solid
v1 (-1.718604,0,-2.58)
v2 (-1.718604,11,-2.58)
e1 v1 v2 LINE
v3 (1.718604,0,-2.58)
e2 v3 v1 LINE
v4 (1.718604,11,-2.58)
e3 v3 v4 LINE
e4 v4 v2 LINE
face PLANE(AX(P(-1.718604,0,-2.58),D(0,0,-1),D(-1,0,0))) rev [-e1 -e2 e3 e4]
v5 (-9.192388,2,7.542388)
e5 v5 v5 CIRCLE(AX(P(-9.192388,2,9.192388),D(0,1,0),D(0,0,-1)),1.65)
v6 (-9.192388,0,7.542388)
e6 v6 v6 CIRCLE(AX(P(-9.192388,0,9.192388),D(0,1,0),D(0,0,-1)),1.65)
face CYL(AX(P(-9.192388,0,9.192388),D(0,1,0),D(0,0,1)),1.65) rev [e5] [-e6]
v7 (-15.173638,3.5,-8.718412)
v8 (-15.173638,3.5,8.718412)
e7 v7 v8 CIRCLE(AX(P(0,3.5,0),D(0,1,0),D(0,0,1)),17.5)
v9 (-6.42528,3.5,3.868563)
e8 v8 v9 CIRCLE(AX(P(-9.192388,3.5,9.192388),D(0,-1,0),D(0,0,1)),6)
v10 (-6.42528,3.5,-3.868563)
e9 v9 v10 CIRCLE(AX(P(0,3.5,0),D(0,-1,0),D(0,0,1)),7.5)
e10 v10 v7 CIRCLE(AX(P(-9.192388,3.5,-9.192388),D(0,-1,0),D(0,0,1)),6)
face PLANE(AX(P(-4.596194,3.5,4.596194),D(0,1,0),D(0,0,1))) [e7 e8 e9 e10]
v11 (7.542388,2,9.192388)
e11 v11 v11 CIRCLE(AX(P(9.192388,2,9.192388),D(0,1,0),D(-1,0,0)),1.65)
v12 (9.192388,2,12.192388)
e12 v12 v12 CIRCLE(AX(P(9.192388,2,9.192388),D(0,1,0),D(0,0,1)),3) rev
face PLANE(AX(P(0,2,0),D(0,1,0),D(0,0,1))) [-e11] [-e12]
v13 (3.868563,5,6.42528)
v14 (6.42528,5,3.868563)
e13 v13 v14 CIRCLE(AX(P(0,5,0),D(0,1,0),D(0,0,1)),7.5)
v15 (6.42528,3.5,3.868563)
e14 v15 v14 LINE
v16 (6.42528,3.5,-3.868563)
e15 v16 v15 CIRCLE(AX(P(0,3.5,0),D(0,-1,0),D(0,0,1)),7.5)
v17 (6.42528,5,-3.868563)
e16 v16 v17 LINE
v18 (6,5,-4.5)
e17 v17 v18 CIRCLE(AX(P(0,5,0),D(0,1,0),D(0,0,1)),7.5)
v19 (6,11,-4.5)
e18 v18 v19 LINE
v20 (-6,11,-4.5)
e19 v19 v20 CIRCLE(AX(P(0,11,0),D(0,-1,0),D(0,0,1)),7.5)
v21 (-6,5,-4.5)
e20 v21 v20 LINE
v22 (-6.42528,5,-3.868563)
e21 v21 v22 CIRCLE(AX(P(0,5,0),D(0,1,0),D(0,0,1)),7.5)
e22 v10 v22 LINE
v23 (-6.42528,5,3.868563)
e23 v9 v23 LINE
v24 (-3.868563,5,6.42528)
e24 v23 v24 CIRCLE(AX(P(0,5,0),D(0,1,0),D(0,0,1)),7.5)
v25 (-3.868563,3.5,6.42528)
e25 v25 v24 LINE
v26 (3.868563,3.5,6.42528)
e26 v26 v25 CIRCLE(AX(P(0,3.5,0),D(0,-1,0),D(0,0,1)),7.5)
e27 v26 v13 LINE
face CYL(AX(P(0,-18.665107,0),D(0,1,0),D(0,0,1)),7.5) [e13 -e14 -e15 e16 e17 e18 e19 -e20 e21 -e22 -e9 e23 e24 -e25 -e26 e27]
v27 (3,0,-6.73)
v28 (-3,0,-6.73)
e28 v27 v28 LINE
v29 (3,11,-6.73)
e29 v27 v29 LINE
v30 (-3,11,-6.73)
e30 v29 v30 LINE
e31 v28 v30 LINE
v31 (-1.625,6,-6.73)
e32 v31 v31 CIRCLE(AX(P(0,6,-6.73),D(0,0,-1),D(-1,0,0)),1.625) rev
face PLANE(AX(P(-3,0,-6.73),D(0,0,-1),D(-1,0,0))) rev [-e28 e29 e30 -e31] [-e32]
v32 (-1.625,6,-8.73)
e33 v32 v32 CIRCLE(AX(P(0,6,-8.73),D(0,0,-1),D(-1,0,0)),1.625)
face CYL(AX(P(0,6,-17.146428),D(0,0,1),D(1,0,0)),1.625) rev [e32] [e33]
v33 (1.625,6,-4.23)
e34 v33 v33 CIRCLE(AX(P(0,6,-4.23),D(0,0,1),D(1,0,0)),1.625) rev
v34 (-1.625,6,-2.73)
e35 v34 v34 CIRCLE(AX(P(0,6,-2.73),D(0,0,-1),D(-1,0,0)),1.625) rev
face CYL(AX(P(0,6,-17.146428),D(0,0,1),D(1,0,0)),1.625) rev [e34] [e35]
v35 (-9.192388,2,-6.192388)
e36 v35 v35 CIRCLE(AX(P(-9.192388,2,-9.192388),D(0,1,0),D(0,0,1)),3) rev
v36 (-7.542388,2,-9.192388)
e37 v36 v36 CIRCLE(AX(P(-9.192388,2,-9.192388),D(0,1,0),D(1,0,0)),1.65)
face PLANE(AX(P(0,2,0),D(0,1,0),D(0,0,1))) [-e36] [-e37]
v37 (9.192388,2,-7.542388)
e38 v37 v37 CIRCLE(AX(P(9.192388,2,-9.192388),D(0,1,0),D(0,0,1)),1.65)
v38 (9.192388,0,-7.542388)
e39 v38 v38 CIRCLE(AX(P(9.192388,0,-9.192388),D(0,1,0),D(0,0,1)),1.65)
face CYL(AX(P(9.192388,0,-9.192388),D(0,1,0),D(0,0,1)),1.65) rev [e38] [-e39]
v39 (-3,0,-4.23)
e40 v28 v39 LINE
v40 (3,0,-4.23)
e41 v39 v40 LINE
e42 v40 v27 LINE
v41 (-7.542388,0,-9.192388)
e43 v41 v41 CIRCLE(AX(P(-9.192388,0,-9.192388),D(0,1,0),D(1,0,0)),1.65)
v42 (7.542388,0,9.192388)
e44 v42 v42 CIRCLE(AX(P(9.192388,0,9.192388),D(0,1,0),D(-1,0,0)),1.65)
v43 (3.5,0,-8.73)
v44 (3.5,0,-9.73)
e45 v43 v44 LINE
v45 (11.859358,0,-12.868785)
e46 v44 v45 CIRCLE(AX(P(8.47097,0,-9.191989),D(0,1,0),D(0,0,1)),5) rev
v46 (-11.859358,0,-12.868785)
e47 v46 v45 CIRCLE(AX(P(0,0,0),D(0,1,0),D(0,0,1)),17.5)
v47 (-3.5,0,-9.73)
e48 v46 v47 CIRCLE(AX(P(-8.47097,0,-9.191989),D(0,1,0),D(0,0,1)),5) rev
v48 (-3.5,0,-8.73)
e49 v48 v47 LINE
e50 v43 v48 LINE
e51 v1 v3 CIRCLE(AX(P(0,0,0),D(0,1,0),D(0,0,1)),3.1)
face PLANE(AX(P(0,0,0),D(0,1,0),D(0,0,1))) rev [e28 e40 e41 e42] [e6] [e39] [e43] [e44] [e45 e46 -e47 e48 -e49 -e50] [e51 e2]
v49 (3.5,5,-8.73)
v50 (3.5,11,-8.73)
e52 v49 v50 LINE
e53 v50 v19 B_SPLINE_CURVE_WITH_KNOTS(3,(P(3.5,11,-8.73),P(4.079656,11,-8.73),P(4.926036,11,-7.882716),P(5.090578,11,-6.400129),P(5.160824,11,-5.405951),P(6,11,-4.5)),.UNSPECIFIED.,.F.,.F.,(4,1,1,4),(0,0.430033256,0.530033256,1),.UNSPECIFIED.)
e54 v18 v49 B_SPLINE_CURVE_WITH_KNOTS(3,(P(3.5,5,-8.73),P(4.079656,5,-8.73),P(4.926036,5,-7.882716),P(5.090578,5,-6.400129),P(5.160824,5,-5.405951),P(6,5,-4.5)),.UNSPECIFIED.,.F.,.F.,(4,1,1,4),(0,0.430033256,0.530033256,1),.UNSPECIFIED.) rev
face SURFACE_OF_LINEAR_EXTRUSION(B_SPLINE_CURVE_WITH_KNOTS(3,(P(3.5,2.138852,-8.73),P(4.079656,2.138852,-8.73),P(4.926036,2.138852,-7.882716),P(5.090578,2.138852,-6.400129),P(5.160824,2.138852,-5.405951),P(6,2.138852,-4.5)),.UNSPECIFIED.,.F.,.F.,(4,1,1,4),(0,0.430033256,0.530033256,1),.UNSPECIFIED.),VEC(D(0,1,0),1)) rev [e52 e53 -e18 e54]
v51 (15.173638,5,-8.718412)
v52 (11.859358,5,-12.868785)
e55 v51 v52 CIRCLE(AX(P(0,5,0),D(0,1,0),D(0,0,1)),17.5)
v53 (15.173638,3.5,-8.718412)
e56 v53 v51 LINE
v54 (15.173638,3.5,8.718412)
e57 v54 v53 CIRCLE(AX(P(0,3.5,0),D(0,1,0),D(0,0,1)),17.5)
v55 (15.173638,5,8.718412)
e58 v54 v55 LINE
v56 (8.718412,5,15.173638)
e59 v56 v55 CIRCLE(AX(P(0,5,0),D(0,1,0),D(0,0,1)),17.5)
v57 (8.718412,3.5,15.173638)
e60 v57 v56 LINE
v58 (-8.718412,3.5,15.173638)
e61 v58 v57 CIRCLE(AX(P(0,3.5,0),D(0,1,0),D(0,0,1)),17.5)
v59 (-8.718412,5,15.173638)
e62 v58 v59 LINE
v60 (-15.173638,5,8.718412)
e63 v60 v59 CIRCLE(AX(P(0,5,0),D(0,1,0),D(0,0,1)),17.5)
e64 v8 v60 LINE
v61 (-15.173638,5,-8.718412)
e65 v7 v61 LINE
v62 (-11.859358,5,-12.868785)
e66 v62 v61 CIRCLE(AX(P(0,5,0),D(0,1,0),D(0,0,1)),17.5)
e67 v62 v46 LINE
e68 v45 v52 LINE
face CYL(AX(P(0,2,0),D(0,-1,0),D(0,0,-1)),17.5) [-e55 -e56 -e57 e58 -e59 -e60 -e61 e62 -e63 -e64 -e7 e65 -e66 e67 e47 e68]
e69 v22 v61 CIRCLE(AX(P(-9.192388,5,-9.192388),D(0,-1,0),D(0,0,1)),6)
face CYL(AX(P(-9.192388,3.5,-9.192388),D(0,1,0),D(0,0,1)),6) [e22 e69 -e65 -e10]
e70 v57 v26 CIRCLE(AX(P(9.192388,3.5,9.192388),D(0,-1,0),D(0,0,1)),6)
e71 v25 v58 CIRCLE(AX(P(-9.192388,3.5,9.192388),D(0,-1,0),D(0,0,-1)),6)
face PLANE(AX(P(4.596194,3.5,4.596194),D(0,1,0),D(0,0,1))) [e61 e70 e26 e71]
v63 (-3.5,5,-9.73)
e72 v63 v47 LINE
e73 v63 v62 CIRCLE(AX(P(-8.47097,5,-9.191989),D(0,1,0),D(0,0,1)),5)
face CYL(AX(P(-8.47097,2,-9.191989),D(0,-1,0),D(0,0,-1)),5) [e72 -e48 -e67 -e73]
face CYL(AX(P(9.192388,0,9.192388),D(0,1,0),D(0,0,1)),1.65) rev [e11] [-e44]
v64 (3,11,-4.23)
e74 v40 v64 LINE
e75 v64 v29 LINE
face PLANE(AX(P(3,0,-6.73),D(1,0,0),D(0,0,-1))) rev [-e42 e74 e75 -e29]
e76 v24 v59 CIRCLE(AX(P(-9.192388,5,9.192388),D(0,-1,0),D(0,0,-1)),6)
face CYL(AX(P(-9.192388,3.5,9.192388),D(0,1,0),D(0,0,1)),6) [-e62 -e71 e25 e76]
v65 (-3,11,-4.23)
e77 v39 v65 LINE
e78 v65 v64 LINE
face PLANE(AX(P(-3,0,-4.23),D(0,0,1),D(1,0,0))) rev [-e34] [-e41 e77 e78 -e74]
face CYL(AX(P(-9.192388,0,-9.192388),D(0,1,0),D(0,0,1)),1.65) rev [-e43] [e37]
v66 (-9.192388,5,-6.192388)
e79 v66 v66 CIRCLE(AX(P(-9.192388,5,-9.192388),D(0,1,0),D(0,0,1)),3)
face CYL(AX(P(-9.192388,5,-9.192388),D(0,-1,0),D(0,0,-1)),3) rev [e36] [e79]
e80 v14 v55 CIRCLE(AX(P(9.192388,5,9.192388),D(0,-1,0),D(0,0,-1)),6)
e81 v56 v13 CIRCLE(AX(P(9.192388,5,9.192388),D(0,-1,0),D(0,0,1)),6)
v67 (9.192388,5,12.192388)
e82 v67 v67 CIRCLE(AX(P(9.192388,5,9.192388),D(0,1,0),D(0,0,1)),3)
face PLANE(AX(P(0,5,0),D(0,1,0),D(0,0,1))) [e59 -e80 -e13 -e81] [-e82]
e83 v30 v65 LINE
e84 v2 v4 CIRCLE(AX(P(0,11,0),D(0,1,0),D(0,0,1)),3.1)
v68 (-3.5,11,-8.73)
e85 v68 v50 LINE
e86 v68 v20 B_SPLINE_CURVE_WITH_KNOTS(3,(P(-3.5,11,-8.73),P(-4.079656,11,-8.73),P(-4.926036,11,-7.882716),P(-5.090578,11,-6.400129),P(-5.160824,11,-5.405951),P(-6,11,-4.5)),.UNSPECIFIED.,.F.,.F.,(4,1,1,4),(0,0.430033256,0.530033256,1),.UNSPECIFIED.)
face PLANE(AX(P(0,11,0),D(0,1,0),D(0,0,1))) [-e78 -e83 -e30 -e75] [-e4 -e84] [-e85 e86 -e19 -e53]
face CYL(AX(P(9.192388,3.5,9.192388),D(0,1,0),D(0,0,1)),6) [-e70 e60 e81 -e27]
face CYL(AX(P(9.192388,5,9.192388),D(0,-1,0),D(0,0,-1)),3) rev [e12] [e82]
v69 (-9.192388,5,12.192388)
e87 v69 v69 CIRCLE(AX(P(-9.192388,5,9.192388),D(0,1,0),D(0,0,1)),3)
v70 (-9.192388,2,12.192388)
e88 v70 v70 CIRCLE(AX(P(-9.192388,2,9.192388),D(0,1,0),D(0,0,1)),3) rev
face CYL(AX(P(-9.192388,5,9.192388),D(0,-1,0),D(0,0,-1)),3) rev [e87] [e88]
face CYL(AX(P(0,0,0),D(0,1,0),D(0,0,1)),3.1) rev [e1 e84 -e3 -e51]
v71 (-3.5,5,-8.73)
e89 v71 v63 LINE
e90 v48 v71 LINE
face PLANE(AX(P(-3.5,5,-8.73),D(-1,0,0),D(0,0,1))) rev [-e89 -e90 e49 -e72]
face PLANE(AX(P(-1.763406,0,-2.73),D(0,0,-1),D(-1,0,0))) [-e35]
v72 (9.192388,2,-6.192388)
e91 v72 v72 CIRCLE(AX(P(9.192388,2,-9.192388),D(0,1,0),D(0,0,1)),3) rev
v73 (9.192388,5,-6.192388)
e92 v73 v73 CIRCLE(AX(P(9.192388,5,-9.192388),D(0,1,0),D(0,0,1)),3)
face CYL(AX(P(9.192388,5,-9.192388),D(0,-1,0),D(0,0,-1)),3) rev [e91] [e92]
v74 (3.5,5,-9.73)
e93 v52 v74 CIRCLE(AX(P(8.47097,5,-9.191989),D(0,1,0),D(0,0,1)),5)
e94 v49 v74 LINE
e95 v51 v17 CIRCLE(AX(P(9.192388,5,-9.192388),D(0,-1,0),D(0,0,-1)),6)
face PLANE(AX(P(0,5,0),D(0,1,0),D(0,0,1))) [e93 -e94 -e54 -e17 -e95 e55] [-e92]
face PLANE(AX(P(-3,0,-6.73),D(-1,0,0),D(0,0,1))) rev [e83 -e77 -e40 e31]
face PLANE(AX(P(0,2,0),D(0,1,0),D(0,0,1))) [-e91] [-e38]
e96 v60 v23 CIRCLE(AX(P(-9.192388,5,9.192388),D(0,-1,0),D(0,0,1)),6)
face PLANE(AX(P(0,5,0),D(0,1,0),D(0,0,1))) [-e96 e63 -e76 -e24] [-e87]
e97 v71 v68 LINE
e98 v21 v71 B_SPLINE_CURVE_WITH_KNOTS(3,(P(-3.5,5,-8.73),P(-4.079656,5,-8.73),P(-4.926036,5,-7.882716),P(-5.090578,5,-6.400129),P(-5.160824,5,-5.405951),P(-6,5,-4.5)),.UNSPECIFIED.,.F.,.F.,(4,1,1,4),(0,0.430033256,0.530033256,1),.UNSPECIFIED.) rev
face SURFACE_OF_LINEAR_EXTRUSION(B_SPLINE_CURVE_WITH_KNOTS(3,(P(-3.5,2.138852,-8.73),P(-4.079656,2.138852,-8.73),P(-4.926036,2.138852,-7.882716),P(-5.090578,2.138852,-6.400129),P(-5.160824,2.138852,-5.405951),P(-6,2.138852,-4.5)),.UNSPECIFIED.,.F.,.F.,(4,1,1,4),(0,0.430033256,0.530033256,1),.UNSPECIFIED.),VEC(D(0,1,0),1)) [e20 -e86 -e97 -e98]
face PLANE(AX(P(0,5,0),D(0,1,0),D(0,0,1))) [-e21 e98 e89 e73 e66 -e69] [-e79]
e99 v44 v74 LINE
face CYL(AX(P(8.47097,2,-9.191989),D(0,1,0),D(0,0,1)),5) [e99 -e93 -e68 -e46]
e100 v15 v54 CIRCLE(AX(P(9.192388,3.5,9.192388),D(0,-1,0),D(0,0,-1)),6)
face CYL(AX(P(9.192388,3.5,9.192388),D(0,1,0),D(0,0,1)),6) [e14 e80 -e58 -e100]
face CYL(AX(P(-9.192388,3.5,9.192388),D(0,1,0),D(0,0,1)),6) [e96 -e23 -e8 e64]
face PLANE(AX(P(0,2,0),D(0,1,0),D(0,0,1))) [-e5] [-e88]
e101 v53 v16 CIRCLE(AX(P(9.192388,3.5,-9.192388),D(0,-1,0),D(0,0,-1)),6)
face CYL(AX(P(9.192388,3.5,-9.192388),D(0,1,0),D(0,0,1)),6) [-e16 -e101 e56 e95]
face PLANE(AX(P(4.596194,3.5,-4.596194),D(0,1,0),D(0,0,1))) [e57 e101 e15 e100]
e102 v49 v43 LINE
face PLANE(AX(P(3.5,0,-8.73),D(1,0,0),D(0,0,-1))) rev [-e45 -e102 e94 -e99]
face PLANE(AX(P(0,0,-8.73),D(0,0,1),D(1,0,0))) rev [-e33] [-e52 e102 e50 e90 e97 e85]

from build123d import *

# Parameters (mm, degrees)
SKETCH_1_R               = 17.5
EXTRUDE_1_DEPTH          = 2
SKETCH_2_R               = 8.75
EXTRUDE_2_DEPTH          = 9
CUT_EXTRUDE_START        = -2
CUT_EXTRUDE_8_DEPTH      = 2
SKETCH_9_R               = 1.65
CUT_EXTRUDE_7_DEPTH      = 27.334388165
PATTERN_CIRCULAR_2_COUNT = 4
SKETCH_10_R              = 17.5
SKETCH_10_R_2            = 8.75
SKETCH_10_R_3            = 3
EXTRUDE_3_DEPTH          = 3
SKETCH_14_W              = 7
SKETCH_14_H              = 5
CUT_EXTRUDE_9_DEPTH      = 34.411263071
SKETCH_3_R               = 1.625
CUT_EXTRUDE_1_DEPTH      = 29.922359862
SKETCH_4_W               = 6
SKETCH_4_H               = 2.5
CUT_EXTRUDE_2_DEPTH      = 28.083205128
SKETCH_11_R              = 1.625
EXTRUDE_4_DEPTH          = 3
FILLET_2_R               = 5
CUT_EXTRUDE_START_2      = -6
CUT_EXTRUDE_11_DEPTH     = 6
CUT_EXTRUDE_START_3      = -1.5
CUT_EXTRUDE_12_DEPTH     = 1.5
EXTRUDE_5_DEPTH          = 11
CUT_EXTRUDE_START_4      = -1
SKETCH_19_R              = 1.625
CUT_EXTRUDE_13_DEPTH     = 1
CUT_EXTRUDE_15_DEPTH     = 6


with BuildPart() as part:
    # Эскиз1 → Бобышка-Вытянуть1 (new body)
    with BuildSketch(Plane(origin=(0, 0, 0), x_dir=(1, 0, 0), z_dir=(0, 1, 0))):
        with Locations(Location((0, 0, 0), (0, 0, 270))):
            Circle(SKETCH_1_R)
    extrude(amount=EXTRUDE_1_DEPTH)

    # Эскиз2 → Бобышка-Вытянуть2 (add)
    with BuildSketch(Plane(origin=(0, 2, 0), x_dir=(1, 0, 0), z_dir=(0, 1, 0))):
        with Locations(Location((0, 0, 0), (0, 0, 270))):
            Circle(SKETCH_2_R)
        with BuildLine():
            Line((-1.763405796, 2.73), (1.763405796, 2.73))
            ThreePointArc((1.763405796, 2.73), (0, -3.25), (-1.763405796, 2.73))
        make_face(mode=Mode.SUBTRACT)
    extrude(amount=EXTRUDE_2_DEPTH)

    # Эскиз12 → Вырез-Вытянуть8 (cut)
    with BuildSketch(Plane(origin=(0, 2, 0), x_dir=(1, 0, 0), z_dir=(0, 1, 0)).offset(CUT_EXTRUDE_START)):
        with BuildLine():
            Line((-1.763405796, 2.73), (1.763405796, 2.73))
            ThreePointArc((1.763405796, 2.73), (0, -3.25), (-1.763405796, 2.73))
        make_face()
    extrude(amount=CUT_EXTRUDE_8_DEPTH, mode=Mode.SUBTRACT)

    # Эскиз9 → Вырез-Вытянуть7 (cut, through all)
    with BuildSketch(Plane(origin=(0, 2, 0), x_dir=(1, 0, 0), z_dir=(0, 1, 0))):
        with Locations(Location((9.192388155, 9.192388155, 0), (0, 0, 270))):
            Circle(SKETCH_9_R)
    cut_extrude_7 = extrude(amount=-CUT_EXTRUDE_7_DEPTH, mode=Mode.SUBTRACT)

    # Круговой массив2: Вырез-Вытянуть7 ×4 about axis
    pattern_circular_2_axis = Axis((0, 0, 0), (0, 1, 0))
    for i in range(1, PATTERN_CIRCULAR_2_COUNT):
        add(cut_extrude_7.rotate(pattern_circular_2_axis, i * 360 / PATTERN_CIRCULAR_2_COUNT), mode=Mode.SUBTRACT)

    # Эскиз10 → Бобышка-Вытянуть3 (add)
    with BuildSketch(Plane(origin=(0, 2, 0), x_dir=(1, 0, 0), z_dir=(0, 1, 0))):
        with Locations(Location((0, 0, 0), (0, 0, 270))):
            Circle(SKETCH_10_R)
        with Locations(Location((0, 0, 0), (0, 0, 270))):
            Circle(SKETCH_10_R_2, mode=Mode.SUBTRACT)
        with Locations(Location((-9.192388155, 9.192388155, 0), (0, 0, 270))):
            Circle(SKETCH_10_R_3, mode=Mode.SUBTRACT)
        with Locations(Location((9.192388155, 9.192388155, 0), (0, 0, 270))):
            Circle(SKETCH_10_R_3, mode=Mode.SUBTRACT)
        with Locations(Location((9.192388155, -9.192388155, 0), (0, 0, 270))):
            Circle(SKETCH_10_R_3, mode=Mode.SUBTRACT)
        with Locations(Location((-9.192388155, -9.192388155, 0), (0, 0, 270))):
            Circle(SKETCH_10_R_3, mode=Mode.SUBTRACT)
    extrude(amount=EXTRUDE_3_DEPTH)

    # Эскиз14 → Вырез-Вытянуть9 (cut, through all)
    with BuildSketch(Plane(origin=(0, 0, -8.75), x_dir=(-1, 0, 0), z_dir=(0, 0, -1))):
        with Locations((0, 2.5)):
            Rectangle(SKETCH_14_W, SKETCH_14_H)
    extrude(amount=CUT_EXTRUDE_9_DEPTH, mode=Mode.SUBTRACT)

    # Эскиз3 → Вырез-Вытянуть1 (cut, through all)
    with BuildSketch(Plane.XY.offset(-2.73)):
        with Locations((0, 6)):
            Circle(SKETCH_3_R)
    extrude(amount=-CUT_EXTRUDE_1_DEPTH, mode=Mode.SUBTRACT)

    # Эскиз4 → Вырез-Вытянуть2 (cut, through all)
    with BuildSketch(Plane(origin=(0, 11, 0), x_dir=(1, 0, 0), z_dir=(0, 1, 0))):
        with Locations((0, 5.48)):
            Rectangle(SKETCH_4_W, SKETCH_4_H)
    extrude(amount=-CUT_EXTRUDE_2_DEPTH, mode=Mode.SUBTRACT)

    # Эскиз11 → Бобышка-Вытянуть4 (add)
    with BuildSketch(Plane.XY.offset(-6.73)):
        Polygon((5, 1), (3.5, 1), (3.5, 0), (-3.5, 0), (-3.5, 1), (-5, 1), (-5, 11), (5, 11), align=None)
        with Locations((0, 6)):
            Circle(SKETCH_11_R, mode=Mode.SUBTRACT)
    extrude(amount=-EXTRUDE_4_DEPTH)

    # Скругление2
    # the kernel refuses this fillet: 5 mm, written as the material it takes off along each edge
    with BuildSketch(Plane(origin=(3.5, 28.475665973, -17.146428199), x_dir=(0.8902152374524571, 0, 0.4555401530133928), z_dir=(0, -1, 0))) as fillet_2_piece_1:
        with BuildLine():
            CenterArc((8.048799762, 4.816686339), FILLET_2_R, 159.077415517, 126.48531946)
            Line((3.378480837, 6.602217391), (3.285074458, 6.637928012))
            ThreePointArc((3.285074458, 6.637928012), (1.600218895, 3.346662711), (-0.089021524, 0.045554015))
            Line((-0.089021524, 0.045554015), (-0.026829333, -0.096333727))
            ThreePointArc((-0.026829333, -0.096333727), (4.695133195, -0.741597813), (9.417095722, -0.096333727))
            Line((9.417095722, -0.096333727), (9.390266389, 0))
        make_face()
    extrude(amount=51.951331945, mode=Mode.SUBTRACT)
    with BuildSketch(Plane(origin=(-3.5, 28.475665973, -17.146428199), x_dir=(-0.8902152374524572, 0, 0.4555401530133924), z_dir=(0, -1, 0))) as fillet_2_piece_2:
        with BuildLine():
            CenterArc((8.048799762, -4.816686339), FILLET_2_R, 74.437265023, 126.48531946)
            Line((3.378480837, -6.602217391), (3.285074458, -6.637928012))
            ThreePointArc((3.285074458, -6.637928012), (1.600218895, -3.346662711), (-0.089021524, -0.045554015))
            Line((-0.089021524, -0.045554015), (-0.026829333, 0.096333727))
            ThreePointArc((-0.026829333, 0.096333727), (4.695133195, 0.741597813), (9.417095722, 0.096333727))
            Line((9.417095722, 0.096333727), (9.390266389, 0))
        make_face()
    extrude(amount=51.951331945, mode=Mode.SUBTRACT)

    # Эскиз16 → Вырез-Вытянуть11 (cut)
    with BuildSketch(Plane(origin=(0, 11, 0), x_dir=(1, 0, 0), z_dir=(0, 1, 0)).offset(CUT_EXTRUDE_START_2)):
        with BuildLine():
            Line((-6, 4.5), (-5, 7.180703308))
            ThreePointArc((-5, 7.180703308), (0, -8.75), (5, 7.180703308))
            Line((5, 7.180703308), (6, 4.5))
            ThreePointArc((6, 4.5), (0, -7.5), (-6, 4.5))
        make_face()
    extrude(amount=CUT_EXTRUDE_11_DEPTH, mode=Mode.SUBTRACT)

    # Эскиз17 → Вырез-Вытянуть12 (cut)
    with BuildSketch(Plane(origin=(0, 5, 0), x_dir=(1, 0, 0), z_dir=(0, 1, 0)).offset(CUT_EXTRUDE_START_3)):
        with BuildLine():
            ThreePointArc((-15.17363778, 8.718412499), (-17.5, 0), (-15.17363778, -8.718412499))
            ThreePointArc((-15.17363778, -8.718412499), (-12.101500502, -3.944811061), (-6.425279536, -3.868563413))
            ThreePointArc((-6.425279536, -3.868563413), (-7.5, 0), (-6.425279536, 3.868563413))
            ThreePointArc((-6.425279536, 3.868563413), (-12.101500502, 3.944811061), (-15.17363778, 8.718412499))
        make_face()
        with BuildLine():
            ThreePointArc((-8.718412499, -15.17363778), (0, -17.5), (8.718412499, -15.17363778))
            ThreePointArc((8.718412499, -15.17363778), (3.944811061, -12.101500502), (3.868563413, -6.425279536))
            ThreePointArc((3.868563413, -6.425279536), (0, -7.5), (-3.868563413, -6.425279536))
            ThreePointArc((-3.868563413, -6.425279536), (-3.944811061, -12.101500502), (-8.718412499, -15.17363778))
        make_face()
        with BuildLine():
            ThreePointArc((15.17363778, -8.718412499), (17.5, 0), (15.17363778, 8.718412499))
            ThreePointArc((15.17363778, 8.718412499), (12.101500502, 3.944811061), (6.425279536, 3.868563413))
            ThreePointArc((6.425279536, 3.868563413), (7.5, 0), (6.425279536, -3.868563413))
            ThreePointArc((6.425279536, -3.868563413), (12.101500502, -3.944811061), (15.17363778, -8.718412499))
        make_face()
    extrude(amount=CUT_EXTRUDE_12_DEPTH, mode=Mode.SUBTRACT)

    # Эскиз18 → Бобышка-Вытянуть5 (add, through all)
    with BuildSketch(Plane(origin=(0, 11, 0), x_dir=(1, 0, 0), z_dir=(0, 1, 0))):
        with BuildLine():
            Line((-1.763405796, 2.73), (1.763405796, 2.73))
            ThreePointArc((1.763405796, 2.73), (0, -3.25), (-1.763405796, 2.73))
        make_face()
        with BuildLine():
            Line((-1.718604085, 2.58), (1.718604085, 2.58))
            ThreePointArc((1.718604085, 2.58), (0, -3.1), (-1.718604085, 2.58))
        make_face(mode=Mode.SUBTRACT)
    extrude(amount=-EXTRUDE_5_DEPTH)

    # Эскиз19 → Вырез-Вытянуть13 (cut)
    with BuildSketch(Plane(origin=(0, 0, -9.73), x_dir=(-1, 0, 0), z_dir=(0, 0, -1)).offset(CUT_EXTRUDE_START_4)):
        Polygon((-5, 11), (5, 11), (5, 5), (3.5, 5), (3.5, 0), (-3.5, 0), (-3.5, 5), (-5, 5), align=None)
        with Locations(Location((0, 6, 0), (0, 0, 180))):
            Circle(SKETCH_19_R, mode=Mode.SUBTRACT)
    extrude(amount=CUT_EXTRUDE_13_DEPTH, mode=Mode.SUBTRACT)

    # Эскиз20 → Вырез-Вытянуть15 (cut)
    with BuildSketch(Plane(origin=(0, 11, 0), x_dir=(1, 0, 0), z_dir=(0, 1, 0))):
        with BuildLine():
            add(Edge.make_bspline(
                [(-3.5, 8.73), (-4.079656123, 8.73), (-4.842651299, 7.966190202), (-4.988696176, 7.252329412), (-5, 7.180703308)],
                knots=[0, 0, 0, 0, 0.430033256, 0.477814729, 0.477814729, 0.477814729, 0.477814729], degree=3))
            Line((-3.5, 8.73), (-5, 8.73))
            Line((-5, 8.73), (-5, 7.180703308))
        make_face()
        with BuildLine():
            add(Edge.make_bspline(
                [(-5, 7.180703308), (-5.012353513, 7.102425904), (-5.096467294, 6.31678513), (-5.16082419, 5.405951438), (-6, 4.5)],
                knots=[0.477814729, 0.477814729, 0.477814729, 0.477814729, 0.530033256, 1, 1, 1, 1], degree=3))
            Line((-5, 7.180703308), (-6, 4.5))
        make_face()
        with BuildLine():
            Line((5, 8.73), (3.5, 8.73))
            add(Edge.make_bspline(
                [(3.5, 8.73), (4.079656123, 8.73), (4.842651299, 7.966190202), (4.988696176, 7.252329412), (5, 7.180703308)],
                knots=[0, 0, 0, 0, 0.430033256, 0.477814729, 0.477814729, 0.477814729, 0.477814729], degree=3))
            Line((5, 7.180703308), (5, 8.73))
        make_face()
        with BuildLine():
            Line((6, 4.5), (5, 7.180703308))
            add(Edge.make_bspline(
                [(5, 7.180703308), (5.012353513, 7.102425904), (5.096467294, 6.31678513), (5.16082419, 5.405951438), (6, 4.5)],
                knots=[0.477814729, 0.477814729, 0.477814729, 0.477814729, 0.530033256, 1, 1, 1, 1], degree=3))
        make_face()
    extrude(amount=-CUT_EXTRUDE_15_DEPTH, mode=Mode.SUBTRACT)


solid = part.part
